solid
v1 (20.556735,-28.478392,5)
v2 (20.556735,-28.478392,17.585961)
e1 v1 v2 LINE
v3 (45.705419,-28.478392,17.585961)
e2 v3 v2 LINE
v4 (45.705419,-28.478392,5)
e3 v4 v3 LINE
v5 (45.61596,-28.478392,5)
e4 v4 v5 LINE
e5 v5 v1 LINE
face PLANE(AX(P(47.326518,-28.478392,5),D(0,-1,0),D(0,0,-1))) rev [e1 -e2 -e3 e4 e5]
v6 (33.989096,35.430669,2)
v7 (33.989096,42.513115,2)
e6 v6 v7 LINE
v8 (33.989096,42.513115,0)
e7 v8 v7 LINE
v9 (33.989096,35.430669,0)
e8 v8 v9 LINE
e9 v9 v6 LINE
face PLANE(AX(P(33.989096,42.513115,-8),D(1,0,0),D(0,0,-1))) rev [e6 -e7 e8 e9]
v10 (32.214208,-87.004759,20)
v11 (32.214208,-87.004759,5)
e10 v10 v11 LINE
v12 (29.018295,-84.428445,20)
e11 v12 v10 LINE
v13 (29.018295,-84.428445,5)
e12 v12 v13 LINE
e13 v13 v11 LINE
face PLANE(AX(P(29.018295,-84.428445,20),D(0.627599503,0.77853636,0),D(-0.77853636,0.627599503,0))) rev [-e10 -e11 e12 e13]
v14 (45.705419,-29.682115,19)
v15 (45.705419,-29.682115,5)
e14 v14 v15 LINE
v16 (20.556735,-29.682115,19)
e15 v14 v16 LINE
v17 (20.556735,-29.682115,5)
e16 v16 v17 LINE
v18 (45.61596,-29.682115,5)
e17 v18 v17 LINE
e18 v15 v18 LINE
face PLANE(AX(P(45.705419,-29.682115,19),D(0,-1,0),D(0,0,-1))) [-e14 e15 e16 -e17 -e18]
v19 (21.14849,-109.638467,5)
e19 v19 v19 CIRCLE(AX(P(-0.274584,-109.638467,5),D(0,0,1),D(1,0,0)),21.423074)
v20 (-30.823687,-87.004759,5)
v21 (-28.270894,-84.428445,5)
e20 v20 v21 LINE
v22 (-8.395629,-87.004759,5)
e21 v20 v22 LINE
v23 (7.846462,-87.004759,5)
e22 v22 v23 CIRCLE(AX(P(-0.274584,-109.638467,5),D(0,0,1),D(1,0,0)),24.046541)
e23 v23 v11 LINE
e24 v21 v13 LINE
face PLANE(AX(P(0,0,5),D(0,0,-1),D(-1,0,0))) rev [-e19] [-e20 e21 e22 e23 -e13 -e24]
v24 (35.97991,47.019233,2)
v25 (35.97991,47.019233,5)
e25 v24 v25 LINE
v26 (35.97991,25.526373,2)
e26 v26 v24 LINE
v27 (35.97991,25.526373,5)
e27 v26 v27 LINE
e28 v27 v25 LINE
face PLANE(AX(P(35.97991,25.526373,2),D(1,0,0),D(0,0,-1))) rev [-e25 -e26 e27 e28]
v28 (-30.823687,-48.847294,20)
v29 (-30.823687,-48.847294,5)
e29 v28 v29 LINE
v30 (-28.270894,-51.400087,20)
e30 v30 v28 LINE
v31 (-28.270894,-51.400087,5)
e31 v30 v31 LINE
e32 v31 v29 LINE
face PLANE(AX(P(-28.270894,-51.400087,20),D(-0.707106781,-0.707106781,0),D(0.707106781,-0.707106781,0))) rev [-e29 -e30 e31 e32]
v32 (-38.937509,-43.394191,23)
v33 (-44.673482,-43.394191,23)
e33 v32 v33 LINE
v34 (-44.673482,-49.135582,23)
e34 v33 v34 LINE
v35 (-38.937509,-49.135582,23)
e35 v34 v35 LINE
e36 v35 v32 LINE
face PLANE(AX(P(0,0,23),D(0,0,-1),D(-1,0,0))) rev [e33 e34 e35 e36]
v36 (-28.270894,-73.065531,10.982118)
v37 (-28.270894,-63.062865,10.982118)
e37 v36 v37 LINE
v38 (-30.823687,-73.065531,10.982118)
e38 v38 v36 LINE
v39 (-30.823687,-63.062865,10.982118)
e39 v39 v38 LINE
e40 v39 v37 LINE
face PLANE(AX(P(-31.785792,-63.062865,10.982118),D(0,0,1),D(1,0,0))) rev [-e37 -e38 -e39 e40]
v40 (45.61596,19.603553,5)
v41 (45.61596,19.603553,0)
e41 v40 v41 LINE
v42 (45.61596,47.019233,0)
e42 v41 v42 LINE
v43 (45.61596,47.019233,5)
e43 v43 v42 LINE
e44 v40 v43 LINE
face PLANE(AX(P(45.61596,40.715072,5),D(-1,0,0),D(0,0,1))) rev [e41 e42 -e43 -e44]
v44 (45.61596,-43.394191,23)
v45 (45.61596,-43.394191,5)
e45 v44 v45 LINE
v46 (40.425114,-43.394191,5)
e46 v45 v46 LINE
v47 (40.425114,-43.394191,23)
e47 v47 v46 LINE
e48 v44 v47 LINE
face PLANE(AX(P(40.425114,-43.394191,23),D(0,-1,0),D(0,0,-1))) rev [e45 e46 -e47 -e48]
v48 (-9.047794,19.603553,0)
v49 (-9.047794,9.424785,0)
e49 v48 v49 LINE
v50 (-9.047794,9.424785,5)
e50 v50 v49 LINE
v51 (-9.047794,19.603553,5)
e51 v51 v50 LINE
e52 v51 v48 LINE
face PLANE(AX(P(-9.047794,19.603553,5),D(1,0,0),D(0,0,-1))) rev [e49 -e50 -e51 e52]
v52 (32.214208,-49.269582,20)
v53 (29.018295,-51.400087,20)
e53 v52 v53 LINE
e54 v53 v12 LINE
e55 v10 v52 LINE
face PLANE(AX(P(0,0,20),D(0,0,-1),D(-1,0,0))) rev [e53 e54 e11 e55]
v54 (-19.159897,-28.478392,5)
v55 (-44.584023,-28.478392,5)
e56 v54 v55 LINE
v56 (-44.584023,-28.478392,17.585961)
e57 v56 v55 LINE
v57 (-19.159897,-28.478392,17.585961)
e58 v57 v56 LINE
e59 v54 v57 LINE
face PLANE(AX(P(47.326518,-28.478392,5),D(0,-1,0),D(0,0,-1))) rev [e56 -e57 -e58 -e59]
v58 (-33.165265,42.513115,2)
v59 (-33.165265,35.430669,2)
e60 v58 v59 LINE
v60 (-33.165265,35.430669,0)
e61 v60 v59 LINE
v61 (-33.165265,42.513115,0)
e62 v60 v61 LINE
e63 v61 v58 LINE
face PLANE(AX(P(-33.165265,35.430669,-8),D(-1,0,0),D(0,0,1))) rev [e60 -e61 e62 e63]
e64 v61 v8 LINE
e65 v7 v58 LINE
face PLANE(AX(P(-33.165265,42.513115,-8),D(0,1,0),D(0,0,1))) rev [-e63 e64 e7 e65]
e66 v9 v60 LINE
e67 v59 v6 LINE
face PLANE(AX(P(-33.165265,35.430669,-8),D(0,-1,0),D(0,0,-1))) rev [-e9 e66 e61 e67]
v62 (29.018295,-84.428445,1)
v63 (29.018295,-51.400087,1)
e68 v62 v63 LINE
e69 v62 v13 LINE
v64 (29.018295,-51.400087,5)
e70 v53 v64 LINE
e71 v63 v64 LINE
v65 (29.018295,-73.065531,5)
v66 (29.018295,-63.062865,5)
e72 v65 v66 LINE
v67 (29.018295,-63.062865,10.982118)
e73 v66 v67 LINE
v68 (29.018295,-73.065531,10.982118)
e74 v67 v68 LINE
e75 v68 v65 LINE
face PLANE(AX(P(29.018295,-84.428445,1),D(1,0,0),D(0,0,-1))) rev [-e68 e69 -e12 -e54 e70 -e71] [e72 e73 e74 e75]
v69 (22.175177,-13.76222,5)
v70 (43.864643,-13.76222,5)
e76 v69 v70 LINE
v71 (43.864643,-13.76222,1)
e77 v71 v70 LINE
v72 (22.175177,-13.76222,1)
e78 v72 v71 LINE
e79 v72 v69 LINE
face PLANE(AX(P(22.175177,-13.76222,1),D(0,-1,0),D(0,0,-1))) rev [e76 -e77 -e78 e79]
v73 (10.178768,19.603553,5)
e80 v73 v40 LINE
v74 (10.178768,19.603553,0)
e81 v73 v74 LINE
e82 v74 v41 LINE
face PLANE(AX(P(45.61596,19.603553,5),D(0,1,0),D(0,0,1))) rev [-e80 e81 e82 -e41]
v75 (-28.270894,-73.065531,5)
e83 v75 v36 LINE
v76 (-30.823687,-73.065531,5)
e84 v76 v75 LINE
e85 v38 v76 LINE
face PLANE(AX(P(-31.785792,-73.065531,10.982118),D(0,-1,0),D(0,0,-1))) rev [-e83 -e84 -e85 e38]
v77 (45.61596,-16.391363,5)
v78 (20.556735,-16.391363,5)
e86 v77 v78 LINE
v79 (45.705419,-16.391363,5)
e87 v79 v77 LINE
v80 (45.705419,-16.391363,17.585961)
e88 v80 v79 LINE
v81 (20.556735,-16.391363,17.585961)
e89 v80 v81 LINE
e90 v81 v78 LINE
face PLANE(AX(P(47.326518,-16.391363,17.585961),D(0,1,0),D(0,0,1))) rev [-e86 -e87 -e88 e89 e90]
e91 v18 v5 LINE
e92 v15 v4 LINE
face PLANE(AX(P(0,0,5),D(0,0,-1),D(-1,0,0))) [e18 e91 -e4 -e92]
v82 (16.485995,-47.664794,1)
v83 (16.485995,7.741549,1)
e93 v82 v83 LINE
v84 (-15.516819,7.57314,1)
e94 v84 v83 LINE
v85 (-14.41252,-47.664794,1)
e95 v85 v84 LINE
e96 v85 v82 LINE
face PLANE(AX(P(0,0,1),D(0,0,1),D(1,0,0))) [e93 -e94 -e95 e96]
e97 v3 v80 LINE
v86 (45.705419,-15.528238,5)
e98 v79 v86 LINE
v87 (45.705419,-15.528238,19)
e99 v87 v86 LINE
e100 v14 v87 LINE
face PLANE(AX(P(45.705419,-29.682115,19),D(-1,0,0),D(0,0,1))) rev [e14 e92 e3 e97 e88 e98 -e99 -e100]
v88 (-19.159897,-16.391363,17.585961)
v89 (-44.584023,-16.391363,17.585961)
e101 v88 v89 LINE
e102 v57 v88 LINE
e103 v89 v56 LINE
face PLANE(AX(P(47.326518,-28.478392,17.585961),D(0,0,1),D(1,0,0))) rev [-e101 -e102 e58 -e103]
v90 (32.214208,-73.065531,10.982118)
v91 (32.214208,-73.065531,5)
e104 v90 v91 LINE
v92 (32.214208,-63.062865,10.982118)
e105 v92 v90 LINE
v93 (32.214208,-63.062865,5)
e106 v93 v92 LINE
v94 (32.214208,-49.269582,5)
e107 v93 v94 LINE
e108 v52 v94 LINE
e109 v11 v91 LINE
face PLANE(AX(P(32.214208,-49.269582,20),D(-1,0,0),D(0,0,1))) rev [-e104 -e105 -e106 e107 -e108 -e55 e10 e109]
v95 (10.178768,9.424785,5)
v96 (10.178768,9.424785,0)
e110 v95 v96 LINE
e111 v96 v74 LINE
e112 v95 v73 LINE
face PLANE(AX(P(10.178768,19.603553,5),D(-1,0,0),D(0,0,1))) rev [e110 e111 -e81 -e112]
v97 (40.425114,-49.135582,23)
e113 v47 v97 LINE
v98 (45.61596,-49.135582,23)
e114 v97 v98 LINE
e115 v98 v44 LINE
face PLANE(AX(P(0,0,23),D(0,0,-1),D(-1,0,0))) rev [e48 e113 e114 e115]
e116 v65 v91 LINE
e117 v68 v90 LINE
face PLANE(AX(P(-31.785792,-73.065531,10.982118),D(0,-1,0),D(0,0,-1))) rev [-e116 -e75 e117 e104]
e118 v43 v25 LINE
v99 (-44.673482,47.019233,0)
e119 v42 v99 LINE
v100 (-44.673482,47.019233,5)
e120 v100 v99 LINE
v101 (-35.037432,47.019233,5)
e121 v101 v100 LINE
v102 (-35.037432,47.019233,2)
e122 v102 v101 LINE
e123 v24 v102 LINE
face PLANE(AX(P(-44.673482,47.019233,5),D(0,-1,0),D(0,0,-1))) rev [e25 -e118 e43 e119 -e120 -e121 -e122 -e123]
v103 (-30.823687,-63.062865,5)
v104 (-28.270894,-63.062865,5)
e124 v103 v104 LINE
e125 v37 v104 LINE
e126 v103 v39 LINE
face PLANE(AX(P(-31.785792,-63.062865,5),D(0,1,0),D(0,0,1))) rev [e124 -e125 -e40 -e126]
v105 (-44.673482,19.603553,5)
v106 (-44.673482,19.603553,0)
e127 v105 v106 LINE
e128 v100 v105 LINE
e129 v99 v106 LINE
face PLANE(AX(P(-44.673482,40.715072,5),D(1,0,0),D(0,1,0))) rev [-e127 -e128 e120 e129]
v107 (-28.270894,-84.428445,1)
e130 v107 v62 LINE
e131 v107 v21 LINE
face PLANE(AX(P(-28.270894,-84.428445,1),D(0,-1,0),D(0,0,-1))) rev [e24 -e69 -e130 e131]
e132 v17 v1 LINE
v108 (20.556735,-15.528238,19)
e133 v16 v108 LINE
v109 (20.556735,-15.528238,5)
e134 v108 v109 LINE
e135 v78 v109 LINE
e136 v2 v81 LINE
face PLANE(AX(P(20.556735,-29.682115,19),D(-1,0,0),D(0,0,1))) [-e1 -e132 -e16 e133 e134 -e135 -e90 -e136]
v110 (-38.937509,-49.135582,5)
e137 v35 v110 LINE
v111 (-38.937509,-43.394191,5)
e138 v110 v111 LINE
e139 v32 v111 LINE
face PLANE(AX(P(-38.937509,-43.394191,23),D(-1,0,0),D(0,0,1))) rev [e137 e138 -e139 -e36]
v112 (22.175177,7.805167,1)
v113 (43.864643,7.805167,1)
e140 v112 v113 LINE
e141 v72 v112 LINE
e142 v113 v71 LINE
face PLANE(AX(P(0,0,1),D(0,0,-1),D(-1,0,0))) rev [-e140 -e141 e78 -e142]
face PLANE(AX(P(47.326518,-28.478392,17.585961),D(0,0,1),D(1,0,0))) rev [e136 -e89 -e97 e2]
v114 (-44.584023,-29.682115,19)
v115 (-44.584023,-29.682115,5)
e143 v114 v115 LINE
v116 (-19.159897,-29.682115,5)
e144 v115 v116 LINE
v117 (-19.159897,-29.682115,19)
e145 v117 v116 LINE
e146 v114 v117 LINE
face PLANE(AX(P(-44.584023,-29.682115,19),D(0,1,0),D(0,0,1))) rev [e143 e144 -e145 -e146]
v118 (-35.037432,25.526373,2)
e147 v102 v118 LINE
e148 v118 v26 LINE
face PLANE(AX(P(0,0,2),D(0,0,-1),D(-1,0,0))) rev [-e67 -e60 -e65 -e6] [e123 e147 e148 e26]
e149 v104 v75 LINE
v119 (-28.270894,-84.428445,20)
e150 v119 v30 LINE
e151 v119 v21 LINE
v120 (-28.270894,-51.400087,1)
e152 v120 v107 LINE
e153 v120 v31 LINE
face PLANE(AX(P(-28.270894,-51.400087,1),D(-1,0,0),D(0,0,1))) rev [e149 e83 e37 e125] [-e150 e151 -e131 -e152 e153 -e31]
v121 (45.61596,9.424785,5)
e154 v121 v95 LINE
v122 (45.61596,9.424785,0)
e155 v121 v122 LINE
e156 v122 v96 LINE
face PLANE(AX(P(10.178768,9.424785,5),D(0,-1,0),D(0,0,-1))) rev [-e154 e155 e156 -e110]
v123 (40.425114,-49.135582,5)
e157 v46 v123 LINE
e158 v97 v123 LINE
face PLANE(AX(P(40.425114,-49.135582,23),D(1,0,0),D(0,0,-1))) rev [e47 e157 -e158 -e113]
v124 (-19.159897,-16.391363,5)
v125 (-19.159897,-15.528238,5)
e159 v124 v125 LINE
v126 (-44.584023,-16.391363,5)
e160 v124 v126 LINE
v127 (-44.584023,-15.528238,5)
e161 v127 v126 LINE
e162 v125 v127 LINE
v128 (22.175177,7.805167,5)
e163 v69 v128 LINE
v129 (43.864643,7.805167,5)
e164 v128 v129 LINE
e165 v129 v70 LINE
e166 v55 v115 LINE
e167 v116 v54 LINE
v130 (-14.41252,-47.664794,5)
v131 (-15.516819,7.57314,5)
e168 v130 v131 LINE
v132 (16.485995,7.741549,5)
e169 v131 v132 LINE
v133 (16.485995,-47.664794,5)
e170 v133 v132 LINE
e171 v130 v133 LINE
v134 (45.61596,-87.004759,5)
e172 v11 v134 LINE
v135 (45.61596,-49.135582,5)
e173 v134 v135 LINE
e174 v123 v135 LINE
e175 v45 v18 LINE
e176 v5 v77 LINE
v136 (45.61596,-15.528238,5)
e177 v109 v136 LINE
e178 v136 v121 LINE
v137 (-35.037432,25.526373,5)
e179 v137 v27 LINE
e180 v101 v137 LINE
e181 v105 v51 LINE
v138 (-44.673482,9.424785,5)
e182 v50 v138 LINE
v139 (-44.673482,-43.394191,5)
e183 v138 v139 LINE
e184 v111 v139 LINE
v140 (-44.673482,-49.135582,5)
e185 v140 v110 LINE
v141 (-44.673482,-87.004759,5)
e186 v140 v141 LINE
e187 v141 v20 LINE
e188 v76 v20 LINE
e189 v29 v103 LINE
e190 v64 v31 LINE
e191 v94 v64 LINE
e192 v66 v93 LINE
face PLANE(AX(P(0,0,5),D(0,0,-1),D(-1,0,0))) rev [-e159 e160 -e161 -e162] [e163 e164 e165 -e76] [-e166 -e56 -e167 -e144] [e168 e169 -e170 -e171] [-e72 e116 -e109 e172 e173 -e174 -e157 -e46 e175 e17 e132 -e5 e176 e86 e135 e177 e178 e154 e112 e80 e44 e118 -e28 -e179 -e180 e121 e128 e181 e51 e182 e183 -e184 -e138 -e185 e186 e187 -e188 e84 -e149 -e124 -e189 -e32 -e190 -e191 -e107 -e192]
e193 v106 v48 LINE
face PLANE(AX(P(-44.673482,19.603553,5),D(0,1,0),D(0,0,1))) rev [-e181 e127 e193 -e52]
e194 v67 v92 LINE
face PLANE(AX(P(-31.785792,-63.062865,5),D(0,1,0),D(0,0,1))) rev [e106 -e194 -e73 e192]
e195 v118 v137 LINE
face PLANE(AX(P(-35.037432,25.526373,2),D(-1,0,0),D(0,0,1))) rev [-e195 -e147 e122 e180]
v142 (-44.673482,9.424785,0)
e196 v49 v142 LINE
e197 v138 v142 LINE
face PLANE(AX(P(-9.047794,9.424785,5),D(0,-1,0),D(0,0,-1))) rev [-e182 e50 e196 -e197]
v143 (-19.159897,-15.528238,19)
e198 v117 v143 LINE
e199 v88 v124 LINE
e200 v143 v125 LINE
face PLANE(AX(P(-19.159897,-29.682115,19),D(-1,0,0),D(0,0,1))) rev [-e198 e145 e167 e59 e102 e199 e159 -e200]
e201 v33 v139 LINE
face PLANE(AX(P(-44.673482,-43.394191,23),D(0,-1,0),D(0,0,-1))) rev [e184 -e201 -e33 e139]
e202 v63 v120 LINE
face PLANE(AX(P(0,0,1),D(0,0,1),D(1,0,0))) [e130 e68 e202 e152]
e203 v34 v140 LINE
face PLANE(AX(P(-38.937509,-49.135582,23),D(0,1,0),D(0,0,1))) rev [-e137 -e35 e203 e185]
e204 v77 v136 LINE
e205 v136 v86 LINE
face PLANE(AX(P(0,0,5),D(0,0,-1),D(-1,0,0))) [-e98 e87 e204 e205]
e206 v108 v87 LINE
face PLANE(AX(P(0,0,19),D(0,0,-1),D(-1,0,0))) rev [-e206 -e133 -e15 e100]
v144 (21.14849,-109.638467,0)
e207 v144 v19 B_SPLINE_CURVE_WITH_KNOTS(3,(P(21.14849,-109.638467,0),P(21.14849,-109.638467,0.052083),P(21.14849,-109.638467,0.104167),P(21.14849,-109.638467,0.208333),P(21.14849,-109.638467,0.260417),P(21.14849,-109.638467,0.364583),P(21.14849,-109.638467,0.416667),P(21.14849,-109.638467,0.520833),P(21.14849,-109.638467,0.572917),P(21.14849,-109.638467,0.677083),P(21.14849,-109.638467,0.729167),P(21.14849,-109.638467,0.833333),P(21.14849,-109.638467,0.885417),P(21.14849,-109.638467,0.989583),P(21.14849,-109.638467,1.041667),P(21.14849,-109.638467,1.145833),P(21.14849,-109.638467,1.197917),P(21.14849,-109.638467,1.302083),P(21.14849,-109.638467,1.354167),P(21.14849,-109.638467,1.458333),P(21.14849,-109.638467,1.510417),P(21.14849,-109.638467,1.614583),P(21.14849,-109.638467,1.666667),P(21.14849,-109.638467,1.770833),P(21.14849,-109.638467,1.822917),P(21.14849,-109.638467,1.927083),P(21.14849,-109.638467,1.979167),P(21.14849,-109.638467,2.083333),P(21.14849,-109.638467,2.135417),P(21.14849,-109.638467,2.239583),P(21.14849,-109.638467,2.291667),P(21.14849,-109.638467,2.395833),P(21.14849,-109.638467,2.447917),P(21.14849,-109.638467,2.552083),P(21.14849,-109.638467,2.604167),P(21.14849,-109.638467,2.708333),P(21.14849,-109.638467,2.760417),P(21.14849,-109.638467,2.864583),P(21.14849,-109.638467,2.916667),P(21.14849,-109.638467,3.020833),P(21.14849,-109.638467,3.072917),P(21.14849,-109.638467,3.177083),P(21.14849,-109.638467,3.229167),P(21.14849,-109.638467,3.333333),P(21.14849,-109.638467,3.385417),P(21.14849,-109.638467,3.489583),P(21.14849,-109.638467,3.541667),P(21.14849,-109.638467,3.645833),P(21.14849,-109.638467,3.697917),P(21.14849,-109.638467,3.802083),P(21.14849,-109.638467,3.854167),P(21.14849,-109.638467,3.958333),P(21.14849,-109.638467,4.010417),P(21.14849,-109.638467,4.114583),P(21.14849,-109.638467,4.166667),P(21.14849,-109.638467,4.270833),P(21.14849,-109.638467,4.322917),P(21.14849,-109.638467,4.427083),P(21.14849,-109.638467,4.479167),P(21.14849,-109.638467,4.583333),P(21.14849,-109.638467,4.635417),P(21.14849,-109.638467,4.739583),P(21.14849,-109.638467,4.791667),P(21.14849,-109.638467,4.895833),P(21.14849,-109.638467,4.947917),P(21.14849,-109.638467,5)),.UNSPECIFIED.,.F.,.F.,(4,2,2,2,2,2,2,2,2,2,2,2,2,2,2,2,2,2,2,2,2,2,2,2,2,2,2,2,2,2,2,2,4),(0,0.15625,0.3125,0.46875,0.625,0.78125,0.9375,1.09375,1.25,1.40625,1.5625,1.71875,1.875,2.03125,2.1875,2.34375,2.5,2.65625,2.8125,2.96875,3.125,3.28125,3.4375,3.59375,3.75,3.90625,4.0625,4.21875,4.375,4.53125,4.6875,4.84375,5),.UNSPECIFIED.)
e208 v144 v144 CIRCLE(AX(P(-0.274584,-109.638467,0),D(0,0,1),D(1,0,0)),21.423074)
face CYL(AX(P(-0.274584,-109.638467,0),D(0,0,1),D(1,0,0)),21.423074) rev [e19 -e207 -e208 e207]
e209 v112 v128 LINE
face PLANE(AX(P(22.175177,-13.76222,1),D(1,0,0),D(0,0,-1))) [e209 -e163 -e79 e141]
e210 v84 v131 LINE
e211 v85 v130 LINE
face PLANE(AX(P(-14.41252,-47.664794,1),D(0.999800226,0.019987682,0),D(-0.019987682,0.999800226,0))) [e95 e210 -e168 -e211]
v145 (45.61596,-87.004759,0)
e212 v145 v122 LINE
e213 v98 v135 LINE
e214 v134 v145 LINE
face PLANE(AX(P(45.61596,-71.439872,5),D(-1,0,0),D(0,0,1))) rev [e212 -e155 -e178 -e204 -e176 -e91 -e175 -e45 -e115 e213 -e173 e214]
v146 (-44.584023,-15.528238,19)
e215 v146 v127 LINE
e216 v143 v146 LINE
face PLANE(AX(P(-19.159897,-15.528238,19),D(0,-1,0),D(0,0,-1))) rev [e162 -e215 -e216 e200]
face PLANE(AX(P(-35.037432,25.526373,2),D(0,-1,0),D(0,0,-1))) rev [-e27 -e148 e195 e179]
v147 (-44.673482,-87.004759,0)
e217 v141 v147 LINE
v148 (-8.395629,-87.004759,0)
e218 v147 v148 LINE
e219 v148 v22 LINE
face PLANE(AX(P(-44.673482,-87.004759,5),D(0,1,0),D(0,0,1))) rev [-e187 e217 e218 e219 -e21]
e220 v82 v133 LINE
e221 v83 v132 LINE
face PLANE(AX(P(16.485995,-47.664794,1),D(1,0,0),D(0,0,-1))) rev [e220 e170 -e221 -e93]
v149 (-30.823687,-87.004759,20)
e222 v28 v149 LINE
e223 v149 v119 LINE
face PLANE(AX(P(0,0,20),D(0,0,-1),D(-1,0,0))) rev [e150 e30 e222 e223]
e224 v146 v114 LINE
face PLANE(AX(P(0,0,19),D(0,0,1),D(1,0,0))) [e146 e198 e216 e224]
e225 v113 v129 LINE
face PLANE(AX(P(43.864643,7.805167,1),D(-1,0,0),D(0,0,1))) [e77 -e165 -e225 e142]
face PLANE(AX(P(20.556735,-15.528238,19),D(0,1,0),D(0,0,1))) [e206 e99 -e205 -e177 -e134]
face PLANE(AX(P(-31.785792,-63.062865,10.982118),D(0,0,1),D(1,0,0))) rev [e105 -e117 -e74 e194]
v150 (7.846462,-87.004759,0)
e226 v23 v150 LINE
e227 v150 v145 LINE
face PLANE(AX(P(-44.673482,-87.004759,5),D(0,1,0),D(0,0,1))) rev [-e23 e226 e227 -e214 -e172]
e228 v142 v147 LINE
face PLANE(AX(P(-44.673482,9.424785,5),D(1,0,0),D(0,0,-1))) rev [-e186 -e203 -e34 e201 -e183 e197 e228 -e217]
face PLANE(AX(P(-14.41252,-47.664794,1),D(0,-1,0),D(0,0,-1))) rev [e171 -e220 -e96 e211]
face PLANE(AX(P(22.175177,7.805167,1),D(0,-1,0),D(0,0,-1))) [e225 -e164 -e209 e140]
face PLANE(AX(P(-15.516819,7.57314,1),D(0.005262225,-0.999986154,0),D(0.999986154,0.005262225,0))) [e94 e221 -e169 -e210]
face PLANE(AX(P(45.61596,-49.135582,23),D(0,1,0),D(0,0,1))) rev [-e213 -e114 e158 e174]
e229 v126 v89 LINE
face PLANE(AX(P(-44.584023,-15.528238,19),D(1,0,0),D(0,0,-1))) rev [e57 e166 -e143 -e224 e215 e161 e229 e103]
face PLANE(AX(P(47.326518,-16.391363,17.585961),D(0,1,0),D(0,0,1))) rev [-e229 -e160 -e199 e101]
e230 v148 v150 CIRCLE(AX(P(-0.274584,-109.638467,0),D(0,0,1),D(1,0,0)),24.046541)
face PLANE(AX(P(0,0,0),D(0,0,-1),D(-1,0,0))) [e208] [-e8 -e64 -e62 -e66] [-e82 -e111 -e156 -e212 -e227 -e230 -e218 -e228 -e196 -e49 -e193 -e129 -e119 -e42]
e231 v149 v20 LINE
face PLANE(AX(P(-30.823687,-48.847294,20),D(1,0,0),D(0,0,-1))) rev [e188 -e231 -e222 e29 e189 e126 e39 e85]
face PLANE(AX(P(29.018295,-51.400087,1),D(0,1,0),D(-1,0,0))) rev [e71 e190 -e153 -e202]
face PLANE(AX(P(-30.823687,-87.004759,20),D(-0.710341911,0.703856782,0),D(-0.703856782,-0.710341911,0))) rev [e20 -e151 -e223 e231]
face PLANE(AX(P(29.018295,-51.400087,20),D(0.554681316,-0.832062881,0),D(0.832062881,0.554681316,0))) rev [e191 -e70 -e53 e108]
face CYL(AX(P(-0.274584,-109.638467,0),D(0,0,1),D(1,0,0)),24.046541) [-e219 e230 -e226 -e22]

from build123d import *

# Parameters (mm, degrees)
BASE_SEGUIDOR_DEPTH        = 5
RESIZE_BASE_BY             = 10.718934909
RESIZE_BASE_2_BY           = 6.304160727
MOVER_START                = -87.004758572
MOVER_FACE10_OUTLINE_W     = 90.28944226
MOVER_FACE10_OUTLINE_H     = 5
MOVER_FACE10_DEPTH         = 4.845951812
ESBO_O27_W                 = 5.735972996
ESBO_O27_H                 = 5.741390801
ESBO_O27_W_2               = 5.190846063
BASE_ENGERENAGEM_DEPTH     = 18
ESBO_O18_R                 = 24.046540625
ESBO_O18_R_2               = 21.423073694
RESSALTO_EXTRUS_O11_DEPTH  = 5
ESBO_O22_W                 = 57.28918899
ESBO_O22_H                 = 33.028358432
CORTE_EXTRUS_O2_DEPTH      = 4
RESSALTO_EXTRUS_O12_DEPTH  = 15
ESBO_O26_W                 = 5.982118077
ESBO_O26_H                 = 10.002665269
CORTE_EXTRUS_O3_DEPTH      = 64
ESBO_O6_W                  = 25.148684125
ESBO_O6_H                  = 14.153877123
ESBO_O6_W_2                = 25.424126456
RESSALTO_EXTRUS_O10_DEPTH  = 14
ESBO_O19_W                 = 12.585961191
ESBO_O19_H                 = 12.087029767
CORTE_EXTRUS_O1_DEPTH      = 92
ESBO_O4_W                  = 21.689466083
ESBO_O4_H                  = 21.567386105
PCB_BURACOS_DEPTH          = 4
ESBO_O2_W                  = 71.017341725
ESBO_O2_H                  = 21.492860186
SENSOR_INFRA_ENCAIXE_DEPTH = 3
ESBO_O9_W                  = 67.154361664
ESBO_O9_H                  = 7.082446002
FURO_SENSOR_DEPTH          = 10


# Read off the part's stored shape, not the designer's step: Mover face10
with BuildPart() as part:
    # Esboço1 → base_seguidor (new body)
    with BuildSketch(Plane.XY):
        Polygon((-44.67348187, 40.715072084), (-44.67348187, 19.603553226), (-9.047793796, 19.603553226), (-9.047793796, 9.424785205), (-44.67348187, 9.424785205), (-44.67348187, -71.439871851), (45.61596039, -71.439871851), (45.61596039, 9.424785205), (10.178768021, 9.424785205), (10.178768021, 19.603553226), (45.61596039, 19.603553226), (45.61596039, 40.715072084), align=None)
    extrude(amount=BASE_SEGUIDOR_DEPTH)

    # resize_base: a face moved outward by 10.718935
    extrude(part.faces().sort_by_distance((0.47123926, -71.439871851, 2.5))[0], amount=RESIZE_BASE_BY, dir=(0, -1, 0))

    # resize_base_2: a face moved outward by 6.304161
    extrude(part.faces().sort_by_distance((0.47123926, 40.715072084, 2.5))[0], amount=RESIZE_BASE_2_BY, dir=(0, 1, 0))

    # Mover face10 outline → Mover face10 (add)
    with BuildSketch(Plane(origin=(0, 0, 0), x_dir=(1, 0, 0), z_dir=(0, 1, 0)).offset(MOVER_START)):
        with Locations((0.47123926, -2.5)):
            Rectangle(MOVER_FACE10_OUTLINE_W, MOVER_FACE10_OUTLINE_H)
    extrude(amount=MOVER_FACE10_DEPTH)

    # Esboço27 → base_engerenagem (add)
    with BuildSketch(Plane.XY.offset(5)):
        with Locations((-41.805495372, -46.264886582)):
            Rectangle(ESBO_O27_W, ESBO_O27_H)
        with Locations((43.020537359, -46.264886582)):
            Rectangle(ESBO_O27_W_2, ESBO_O27_H)
    extrude(amount=BASE_ENGERENAGEM_DEPTH)

    # Esboço18 → Ressalto-extrusão11 (add)
    with BuildSketch(Plane.XY.offset(5)):
        with Locations((-0.274583628, -109.638466508)):
            Circle(ESBO_O18_R)
        with Locations((-0.274583628, -109.638466508)):
            Circle(ESBO_O18_R_2, mode=Mode.SUBTRACT)
    extrude(amount=-RESSALTO_EXTRUS_O11_DEPTH)

    # Esboço22 → Corte-extrusão2 (cut)
    with BuildSketch(Plane.XY.offset(5)):
        with Locations((0.373700248, -67.914265776)):
            Rectangle(ESBO_O22_W, ESBO_O22_H)
    extrude(amount=-CORTE_EXTRUS_O2_DEPTH, mode=Mode.SUBTRACT)

    # Esboço24 → Ressalto-extrusão12 (add)
    with BuildSketch(Plane.XY.offset(5)):
        Polygon((-28.270894247, -51.40008656), (-30.823687143, -48.847293665), (-30.823687143, -87.004758572), (-28.270894247, -84.428444992), align=None)
        Polygon((29.018294743, -51.40008656), (32.214208361, -49.269582228), (32.214208361, -87.004758572), (29.018294743, -84.428444992), align=None)
    extrude(amount=RESSALTO_EXTRUS_O12_DEPTH)

    # Esboço26 → Corte-extrusão3 (cut)
    with BuildSketch(Plane(origin=(32.214208361, 0, 0), x_dir=(0, 0, -1), z_dir=(1, 0, 0))):
        with Locations((-7.991059039, -68.064198105)):
            Rectangle(ESBO_O26_W, ESBO_O26_H)
    extrude(amount=-CORTE_EXTRUS_O3_DEPTH, mode=Mode.SUBTRACT)

    # Esboço6 → Ressalto-extrusão10 (add)
    with BuildSketch(Plane.XY.offset(5)):
        with Locations((33.131077051, -22.60517657)):
            Rectangle(ESBO_O6_W, ESBO_O6_H)
        with Locations((-31.871959919, -22.60517657)):
            Rectangle(ESBO_O6_W_2, ESBO_O6_H)
    extrude(amount=RESSALTO_EXTRUS_O10_DEPTH)

    # Esboço19 → Corte-extrusão1 (cut)
    with BuildSketch(Plane.ZY.offset(44.67348187)):
        with Locations((11.292980596, -22.434877547)):
            Rectangle(ESBO_O19_W, ESBO_O19_H)
    extrude(amount=-CORTE_EXTRUS_O1_DEPTH, mode=Mode.SUBTRACT)

    # Esboço4 → pcb_buracos (cut)
    with BuildSketch(Plane.XY.offset(5)):
        Polygon((-15.516819289, 7.573140349), (16.485994782, 7.741548684), (16.485994782, -47.664793519), (-14.412520449, -47.664793519), align=None)
        with Locations((33.019910346, -2.978526461)):
            Rectangle(ESBO_O4_W, ESBO_O4_H)
    extrude(amount=-PCB_BURACOS_DEPTH, mode=Mode.SUBTRACT)

    # Esboço2 → sensor_infra_encaixe (cut)
    with BuildSketch(Plane.XY.offset(5)):
        with Locations((0.47123926, 36.272802718)):
            Rectangle(ESBO_O2_W, ESBO_O2_H)
    extrude(amount=-SENSOR_INFRA_ENCAIXE_DEPTH, mode=Mode.SUBTRACT)

    # Esboço9 → furo_sensor (cut)
    with BuildSketch(Plane.XY.offset(2)):
        with Locations((0.411915335, 38.971892304)):
            Rectangle(ESBO_O9_W, ESBO_O9_H)
    extrude(amount=-FURO_SENSOR_DEPTH, mode=Mode.SUBTRACT)


solid = part.part
